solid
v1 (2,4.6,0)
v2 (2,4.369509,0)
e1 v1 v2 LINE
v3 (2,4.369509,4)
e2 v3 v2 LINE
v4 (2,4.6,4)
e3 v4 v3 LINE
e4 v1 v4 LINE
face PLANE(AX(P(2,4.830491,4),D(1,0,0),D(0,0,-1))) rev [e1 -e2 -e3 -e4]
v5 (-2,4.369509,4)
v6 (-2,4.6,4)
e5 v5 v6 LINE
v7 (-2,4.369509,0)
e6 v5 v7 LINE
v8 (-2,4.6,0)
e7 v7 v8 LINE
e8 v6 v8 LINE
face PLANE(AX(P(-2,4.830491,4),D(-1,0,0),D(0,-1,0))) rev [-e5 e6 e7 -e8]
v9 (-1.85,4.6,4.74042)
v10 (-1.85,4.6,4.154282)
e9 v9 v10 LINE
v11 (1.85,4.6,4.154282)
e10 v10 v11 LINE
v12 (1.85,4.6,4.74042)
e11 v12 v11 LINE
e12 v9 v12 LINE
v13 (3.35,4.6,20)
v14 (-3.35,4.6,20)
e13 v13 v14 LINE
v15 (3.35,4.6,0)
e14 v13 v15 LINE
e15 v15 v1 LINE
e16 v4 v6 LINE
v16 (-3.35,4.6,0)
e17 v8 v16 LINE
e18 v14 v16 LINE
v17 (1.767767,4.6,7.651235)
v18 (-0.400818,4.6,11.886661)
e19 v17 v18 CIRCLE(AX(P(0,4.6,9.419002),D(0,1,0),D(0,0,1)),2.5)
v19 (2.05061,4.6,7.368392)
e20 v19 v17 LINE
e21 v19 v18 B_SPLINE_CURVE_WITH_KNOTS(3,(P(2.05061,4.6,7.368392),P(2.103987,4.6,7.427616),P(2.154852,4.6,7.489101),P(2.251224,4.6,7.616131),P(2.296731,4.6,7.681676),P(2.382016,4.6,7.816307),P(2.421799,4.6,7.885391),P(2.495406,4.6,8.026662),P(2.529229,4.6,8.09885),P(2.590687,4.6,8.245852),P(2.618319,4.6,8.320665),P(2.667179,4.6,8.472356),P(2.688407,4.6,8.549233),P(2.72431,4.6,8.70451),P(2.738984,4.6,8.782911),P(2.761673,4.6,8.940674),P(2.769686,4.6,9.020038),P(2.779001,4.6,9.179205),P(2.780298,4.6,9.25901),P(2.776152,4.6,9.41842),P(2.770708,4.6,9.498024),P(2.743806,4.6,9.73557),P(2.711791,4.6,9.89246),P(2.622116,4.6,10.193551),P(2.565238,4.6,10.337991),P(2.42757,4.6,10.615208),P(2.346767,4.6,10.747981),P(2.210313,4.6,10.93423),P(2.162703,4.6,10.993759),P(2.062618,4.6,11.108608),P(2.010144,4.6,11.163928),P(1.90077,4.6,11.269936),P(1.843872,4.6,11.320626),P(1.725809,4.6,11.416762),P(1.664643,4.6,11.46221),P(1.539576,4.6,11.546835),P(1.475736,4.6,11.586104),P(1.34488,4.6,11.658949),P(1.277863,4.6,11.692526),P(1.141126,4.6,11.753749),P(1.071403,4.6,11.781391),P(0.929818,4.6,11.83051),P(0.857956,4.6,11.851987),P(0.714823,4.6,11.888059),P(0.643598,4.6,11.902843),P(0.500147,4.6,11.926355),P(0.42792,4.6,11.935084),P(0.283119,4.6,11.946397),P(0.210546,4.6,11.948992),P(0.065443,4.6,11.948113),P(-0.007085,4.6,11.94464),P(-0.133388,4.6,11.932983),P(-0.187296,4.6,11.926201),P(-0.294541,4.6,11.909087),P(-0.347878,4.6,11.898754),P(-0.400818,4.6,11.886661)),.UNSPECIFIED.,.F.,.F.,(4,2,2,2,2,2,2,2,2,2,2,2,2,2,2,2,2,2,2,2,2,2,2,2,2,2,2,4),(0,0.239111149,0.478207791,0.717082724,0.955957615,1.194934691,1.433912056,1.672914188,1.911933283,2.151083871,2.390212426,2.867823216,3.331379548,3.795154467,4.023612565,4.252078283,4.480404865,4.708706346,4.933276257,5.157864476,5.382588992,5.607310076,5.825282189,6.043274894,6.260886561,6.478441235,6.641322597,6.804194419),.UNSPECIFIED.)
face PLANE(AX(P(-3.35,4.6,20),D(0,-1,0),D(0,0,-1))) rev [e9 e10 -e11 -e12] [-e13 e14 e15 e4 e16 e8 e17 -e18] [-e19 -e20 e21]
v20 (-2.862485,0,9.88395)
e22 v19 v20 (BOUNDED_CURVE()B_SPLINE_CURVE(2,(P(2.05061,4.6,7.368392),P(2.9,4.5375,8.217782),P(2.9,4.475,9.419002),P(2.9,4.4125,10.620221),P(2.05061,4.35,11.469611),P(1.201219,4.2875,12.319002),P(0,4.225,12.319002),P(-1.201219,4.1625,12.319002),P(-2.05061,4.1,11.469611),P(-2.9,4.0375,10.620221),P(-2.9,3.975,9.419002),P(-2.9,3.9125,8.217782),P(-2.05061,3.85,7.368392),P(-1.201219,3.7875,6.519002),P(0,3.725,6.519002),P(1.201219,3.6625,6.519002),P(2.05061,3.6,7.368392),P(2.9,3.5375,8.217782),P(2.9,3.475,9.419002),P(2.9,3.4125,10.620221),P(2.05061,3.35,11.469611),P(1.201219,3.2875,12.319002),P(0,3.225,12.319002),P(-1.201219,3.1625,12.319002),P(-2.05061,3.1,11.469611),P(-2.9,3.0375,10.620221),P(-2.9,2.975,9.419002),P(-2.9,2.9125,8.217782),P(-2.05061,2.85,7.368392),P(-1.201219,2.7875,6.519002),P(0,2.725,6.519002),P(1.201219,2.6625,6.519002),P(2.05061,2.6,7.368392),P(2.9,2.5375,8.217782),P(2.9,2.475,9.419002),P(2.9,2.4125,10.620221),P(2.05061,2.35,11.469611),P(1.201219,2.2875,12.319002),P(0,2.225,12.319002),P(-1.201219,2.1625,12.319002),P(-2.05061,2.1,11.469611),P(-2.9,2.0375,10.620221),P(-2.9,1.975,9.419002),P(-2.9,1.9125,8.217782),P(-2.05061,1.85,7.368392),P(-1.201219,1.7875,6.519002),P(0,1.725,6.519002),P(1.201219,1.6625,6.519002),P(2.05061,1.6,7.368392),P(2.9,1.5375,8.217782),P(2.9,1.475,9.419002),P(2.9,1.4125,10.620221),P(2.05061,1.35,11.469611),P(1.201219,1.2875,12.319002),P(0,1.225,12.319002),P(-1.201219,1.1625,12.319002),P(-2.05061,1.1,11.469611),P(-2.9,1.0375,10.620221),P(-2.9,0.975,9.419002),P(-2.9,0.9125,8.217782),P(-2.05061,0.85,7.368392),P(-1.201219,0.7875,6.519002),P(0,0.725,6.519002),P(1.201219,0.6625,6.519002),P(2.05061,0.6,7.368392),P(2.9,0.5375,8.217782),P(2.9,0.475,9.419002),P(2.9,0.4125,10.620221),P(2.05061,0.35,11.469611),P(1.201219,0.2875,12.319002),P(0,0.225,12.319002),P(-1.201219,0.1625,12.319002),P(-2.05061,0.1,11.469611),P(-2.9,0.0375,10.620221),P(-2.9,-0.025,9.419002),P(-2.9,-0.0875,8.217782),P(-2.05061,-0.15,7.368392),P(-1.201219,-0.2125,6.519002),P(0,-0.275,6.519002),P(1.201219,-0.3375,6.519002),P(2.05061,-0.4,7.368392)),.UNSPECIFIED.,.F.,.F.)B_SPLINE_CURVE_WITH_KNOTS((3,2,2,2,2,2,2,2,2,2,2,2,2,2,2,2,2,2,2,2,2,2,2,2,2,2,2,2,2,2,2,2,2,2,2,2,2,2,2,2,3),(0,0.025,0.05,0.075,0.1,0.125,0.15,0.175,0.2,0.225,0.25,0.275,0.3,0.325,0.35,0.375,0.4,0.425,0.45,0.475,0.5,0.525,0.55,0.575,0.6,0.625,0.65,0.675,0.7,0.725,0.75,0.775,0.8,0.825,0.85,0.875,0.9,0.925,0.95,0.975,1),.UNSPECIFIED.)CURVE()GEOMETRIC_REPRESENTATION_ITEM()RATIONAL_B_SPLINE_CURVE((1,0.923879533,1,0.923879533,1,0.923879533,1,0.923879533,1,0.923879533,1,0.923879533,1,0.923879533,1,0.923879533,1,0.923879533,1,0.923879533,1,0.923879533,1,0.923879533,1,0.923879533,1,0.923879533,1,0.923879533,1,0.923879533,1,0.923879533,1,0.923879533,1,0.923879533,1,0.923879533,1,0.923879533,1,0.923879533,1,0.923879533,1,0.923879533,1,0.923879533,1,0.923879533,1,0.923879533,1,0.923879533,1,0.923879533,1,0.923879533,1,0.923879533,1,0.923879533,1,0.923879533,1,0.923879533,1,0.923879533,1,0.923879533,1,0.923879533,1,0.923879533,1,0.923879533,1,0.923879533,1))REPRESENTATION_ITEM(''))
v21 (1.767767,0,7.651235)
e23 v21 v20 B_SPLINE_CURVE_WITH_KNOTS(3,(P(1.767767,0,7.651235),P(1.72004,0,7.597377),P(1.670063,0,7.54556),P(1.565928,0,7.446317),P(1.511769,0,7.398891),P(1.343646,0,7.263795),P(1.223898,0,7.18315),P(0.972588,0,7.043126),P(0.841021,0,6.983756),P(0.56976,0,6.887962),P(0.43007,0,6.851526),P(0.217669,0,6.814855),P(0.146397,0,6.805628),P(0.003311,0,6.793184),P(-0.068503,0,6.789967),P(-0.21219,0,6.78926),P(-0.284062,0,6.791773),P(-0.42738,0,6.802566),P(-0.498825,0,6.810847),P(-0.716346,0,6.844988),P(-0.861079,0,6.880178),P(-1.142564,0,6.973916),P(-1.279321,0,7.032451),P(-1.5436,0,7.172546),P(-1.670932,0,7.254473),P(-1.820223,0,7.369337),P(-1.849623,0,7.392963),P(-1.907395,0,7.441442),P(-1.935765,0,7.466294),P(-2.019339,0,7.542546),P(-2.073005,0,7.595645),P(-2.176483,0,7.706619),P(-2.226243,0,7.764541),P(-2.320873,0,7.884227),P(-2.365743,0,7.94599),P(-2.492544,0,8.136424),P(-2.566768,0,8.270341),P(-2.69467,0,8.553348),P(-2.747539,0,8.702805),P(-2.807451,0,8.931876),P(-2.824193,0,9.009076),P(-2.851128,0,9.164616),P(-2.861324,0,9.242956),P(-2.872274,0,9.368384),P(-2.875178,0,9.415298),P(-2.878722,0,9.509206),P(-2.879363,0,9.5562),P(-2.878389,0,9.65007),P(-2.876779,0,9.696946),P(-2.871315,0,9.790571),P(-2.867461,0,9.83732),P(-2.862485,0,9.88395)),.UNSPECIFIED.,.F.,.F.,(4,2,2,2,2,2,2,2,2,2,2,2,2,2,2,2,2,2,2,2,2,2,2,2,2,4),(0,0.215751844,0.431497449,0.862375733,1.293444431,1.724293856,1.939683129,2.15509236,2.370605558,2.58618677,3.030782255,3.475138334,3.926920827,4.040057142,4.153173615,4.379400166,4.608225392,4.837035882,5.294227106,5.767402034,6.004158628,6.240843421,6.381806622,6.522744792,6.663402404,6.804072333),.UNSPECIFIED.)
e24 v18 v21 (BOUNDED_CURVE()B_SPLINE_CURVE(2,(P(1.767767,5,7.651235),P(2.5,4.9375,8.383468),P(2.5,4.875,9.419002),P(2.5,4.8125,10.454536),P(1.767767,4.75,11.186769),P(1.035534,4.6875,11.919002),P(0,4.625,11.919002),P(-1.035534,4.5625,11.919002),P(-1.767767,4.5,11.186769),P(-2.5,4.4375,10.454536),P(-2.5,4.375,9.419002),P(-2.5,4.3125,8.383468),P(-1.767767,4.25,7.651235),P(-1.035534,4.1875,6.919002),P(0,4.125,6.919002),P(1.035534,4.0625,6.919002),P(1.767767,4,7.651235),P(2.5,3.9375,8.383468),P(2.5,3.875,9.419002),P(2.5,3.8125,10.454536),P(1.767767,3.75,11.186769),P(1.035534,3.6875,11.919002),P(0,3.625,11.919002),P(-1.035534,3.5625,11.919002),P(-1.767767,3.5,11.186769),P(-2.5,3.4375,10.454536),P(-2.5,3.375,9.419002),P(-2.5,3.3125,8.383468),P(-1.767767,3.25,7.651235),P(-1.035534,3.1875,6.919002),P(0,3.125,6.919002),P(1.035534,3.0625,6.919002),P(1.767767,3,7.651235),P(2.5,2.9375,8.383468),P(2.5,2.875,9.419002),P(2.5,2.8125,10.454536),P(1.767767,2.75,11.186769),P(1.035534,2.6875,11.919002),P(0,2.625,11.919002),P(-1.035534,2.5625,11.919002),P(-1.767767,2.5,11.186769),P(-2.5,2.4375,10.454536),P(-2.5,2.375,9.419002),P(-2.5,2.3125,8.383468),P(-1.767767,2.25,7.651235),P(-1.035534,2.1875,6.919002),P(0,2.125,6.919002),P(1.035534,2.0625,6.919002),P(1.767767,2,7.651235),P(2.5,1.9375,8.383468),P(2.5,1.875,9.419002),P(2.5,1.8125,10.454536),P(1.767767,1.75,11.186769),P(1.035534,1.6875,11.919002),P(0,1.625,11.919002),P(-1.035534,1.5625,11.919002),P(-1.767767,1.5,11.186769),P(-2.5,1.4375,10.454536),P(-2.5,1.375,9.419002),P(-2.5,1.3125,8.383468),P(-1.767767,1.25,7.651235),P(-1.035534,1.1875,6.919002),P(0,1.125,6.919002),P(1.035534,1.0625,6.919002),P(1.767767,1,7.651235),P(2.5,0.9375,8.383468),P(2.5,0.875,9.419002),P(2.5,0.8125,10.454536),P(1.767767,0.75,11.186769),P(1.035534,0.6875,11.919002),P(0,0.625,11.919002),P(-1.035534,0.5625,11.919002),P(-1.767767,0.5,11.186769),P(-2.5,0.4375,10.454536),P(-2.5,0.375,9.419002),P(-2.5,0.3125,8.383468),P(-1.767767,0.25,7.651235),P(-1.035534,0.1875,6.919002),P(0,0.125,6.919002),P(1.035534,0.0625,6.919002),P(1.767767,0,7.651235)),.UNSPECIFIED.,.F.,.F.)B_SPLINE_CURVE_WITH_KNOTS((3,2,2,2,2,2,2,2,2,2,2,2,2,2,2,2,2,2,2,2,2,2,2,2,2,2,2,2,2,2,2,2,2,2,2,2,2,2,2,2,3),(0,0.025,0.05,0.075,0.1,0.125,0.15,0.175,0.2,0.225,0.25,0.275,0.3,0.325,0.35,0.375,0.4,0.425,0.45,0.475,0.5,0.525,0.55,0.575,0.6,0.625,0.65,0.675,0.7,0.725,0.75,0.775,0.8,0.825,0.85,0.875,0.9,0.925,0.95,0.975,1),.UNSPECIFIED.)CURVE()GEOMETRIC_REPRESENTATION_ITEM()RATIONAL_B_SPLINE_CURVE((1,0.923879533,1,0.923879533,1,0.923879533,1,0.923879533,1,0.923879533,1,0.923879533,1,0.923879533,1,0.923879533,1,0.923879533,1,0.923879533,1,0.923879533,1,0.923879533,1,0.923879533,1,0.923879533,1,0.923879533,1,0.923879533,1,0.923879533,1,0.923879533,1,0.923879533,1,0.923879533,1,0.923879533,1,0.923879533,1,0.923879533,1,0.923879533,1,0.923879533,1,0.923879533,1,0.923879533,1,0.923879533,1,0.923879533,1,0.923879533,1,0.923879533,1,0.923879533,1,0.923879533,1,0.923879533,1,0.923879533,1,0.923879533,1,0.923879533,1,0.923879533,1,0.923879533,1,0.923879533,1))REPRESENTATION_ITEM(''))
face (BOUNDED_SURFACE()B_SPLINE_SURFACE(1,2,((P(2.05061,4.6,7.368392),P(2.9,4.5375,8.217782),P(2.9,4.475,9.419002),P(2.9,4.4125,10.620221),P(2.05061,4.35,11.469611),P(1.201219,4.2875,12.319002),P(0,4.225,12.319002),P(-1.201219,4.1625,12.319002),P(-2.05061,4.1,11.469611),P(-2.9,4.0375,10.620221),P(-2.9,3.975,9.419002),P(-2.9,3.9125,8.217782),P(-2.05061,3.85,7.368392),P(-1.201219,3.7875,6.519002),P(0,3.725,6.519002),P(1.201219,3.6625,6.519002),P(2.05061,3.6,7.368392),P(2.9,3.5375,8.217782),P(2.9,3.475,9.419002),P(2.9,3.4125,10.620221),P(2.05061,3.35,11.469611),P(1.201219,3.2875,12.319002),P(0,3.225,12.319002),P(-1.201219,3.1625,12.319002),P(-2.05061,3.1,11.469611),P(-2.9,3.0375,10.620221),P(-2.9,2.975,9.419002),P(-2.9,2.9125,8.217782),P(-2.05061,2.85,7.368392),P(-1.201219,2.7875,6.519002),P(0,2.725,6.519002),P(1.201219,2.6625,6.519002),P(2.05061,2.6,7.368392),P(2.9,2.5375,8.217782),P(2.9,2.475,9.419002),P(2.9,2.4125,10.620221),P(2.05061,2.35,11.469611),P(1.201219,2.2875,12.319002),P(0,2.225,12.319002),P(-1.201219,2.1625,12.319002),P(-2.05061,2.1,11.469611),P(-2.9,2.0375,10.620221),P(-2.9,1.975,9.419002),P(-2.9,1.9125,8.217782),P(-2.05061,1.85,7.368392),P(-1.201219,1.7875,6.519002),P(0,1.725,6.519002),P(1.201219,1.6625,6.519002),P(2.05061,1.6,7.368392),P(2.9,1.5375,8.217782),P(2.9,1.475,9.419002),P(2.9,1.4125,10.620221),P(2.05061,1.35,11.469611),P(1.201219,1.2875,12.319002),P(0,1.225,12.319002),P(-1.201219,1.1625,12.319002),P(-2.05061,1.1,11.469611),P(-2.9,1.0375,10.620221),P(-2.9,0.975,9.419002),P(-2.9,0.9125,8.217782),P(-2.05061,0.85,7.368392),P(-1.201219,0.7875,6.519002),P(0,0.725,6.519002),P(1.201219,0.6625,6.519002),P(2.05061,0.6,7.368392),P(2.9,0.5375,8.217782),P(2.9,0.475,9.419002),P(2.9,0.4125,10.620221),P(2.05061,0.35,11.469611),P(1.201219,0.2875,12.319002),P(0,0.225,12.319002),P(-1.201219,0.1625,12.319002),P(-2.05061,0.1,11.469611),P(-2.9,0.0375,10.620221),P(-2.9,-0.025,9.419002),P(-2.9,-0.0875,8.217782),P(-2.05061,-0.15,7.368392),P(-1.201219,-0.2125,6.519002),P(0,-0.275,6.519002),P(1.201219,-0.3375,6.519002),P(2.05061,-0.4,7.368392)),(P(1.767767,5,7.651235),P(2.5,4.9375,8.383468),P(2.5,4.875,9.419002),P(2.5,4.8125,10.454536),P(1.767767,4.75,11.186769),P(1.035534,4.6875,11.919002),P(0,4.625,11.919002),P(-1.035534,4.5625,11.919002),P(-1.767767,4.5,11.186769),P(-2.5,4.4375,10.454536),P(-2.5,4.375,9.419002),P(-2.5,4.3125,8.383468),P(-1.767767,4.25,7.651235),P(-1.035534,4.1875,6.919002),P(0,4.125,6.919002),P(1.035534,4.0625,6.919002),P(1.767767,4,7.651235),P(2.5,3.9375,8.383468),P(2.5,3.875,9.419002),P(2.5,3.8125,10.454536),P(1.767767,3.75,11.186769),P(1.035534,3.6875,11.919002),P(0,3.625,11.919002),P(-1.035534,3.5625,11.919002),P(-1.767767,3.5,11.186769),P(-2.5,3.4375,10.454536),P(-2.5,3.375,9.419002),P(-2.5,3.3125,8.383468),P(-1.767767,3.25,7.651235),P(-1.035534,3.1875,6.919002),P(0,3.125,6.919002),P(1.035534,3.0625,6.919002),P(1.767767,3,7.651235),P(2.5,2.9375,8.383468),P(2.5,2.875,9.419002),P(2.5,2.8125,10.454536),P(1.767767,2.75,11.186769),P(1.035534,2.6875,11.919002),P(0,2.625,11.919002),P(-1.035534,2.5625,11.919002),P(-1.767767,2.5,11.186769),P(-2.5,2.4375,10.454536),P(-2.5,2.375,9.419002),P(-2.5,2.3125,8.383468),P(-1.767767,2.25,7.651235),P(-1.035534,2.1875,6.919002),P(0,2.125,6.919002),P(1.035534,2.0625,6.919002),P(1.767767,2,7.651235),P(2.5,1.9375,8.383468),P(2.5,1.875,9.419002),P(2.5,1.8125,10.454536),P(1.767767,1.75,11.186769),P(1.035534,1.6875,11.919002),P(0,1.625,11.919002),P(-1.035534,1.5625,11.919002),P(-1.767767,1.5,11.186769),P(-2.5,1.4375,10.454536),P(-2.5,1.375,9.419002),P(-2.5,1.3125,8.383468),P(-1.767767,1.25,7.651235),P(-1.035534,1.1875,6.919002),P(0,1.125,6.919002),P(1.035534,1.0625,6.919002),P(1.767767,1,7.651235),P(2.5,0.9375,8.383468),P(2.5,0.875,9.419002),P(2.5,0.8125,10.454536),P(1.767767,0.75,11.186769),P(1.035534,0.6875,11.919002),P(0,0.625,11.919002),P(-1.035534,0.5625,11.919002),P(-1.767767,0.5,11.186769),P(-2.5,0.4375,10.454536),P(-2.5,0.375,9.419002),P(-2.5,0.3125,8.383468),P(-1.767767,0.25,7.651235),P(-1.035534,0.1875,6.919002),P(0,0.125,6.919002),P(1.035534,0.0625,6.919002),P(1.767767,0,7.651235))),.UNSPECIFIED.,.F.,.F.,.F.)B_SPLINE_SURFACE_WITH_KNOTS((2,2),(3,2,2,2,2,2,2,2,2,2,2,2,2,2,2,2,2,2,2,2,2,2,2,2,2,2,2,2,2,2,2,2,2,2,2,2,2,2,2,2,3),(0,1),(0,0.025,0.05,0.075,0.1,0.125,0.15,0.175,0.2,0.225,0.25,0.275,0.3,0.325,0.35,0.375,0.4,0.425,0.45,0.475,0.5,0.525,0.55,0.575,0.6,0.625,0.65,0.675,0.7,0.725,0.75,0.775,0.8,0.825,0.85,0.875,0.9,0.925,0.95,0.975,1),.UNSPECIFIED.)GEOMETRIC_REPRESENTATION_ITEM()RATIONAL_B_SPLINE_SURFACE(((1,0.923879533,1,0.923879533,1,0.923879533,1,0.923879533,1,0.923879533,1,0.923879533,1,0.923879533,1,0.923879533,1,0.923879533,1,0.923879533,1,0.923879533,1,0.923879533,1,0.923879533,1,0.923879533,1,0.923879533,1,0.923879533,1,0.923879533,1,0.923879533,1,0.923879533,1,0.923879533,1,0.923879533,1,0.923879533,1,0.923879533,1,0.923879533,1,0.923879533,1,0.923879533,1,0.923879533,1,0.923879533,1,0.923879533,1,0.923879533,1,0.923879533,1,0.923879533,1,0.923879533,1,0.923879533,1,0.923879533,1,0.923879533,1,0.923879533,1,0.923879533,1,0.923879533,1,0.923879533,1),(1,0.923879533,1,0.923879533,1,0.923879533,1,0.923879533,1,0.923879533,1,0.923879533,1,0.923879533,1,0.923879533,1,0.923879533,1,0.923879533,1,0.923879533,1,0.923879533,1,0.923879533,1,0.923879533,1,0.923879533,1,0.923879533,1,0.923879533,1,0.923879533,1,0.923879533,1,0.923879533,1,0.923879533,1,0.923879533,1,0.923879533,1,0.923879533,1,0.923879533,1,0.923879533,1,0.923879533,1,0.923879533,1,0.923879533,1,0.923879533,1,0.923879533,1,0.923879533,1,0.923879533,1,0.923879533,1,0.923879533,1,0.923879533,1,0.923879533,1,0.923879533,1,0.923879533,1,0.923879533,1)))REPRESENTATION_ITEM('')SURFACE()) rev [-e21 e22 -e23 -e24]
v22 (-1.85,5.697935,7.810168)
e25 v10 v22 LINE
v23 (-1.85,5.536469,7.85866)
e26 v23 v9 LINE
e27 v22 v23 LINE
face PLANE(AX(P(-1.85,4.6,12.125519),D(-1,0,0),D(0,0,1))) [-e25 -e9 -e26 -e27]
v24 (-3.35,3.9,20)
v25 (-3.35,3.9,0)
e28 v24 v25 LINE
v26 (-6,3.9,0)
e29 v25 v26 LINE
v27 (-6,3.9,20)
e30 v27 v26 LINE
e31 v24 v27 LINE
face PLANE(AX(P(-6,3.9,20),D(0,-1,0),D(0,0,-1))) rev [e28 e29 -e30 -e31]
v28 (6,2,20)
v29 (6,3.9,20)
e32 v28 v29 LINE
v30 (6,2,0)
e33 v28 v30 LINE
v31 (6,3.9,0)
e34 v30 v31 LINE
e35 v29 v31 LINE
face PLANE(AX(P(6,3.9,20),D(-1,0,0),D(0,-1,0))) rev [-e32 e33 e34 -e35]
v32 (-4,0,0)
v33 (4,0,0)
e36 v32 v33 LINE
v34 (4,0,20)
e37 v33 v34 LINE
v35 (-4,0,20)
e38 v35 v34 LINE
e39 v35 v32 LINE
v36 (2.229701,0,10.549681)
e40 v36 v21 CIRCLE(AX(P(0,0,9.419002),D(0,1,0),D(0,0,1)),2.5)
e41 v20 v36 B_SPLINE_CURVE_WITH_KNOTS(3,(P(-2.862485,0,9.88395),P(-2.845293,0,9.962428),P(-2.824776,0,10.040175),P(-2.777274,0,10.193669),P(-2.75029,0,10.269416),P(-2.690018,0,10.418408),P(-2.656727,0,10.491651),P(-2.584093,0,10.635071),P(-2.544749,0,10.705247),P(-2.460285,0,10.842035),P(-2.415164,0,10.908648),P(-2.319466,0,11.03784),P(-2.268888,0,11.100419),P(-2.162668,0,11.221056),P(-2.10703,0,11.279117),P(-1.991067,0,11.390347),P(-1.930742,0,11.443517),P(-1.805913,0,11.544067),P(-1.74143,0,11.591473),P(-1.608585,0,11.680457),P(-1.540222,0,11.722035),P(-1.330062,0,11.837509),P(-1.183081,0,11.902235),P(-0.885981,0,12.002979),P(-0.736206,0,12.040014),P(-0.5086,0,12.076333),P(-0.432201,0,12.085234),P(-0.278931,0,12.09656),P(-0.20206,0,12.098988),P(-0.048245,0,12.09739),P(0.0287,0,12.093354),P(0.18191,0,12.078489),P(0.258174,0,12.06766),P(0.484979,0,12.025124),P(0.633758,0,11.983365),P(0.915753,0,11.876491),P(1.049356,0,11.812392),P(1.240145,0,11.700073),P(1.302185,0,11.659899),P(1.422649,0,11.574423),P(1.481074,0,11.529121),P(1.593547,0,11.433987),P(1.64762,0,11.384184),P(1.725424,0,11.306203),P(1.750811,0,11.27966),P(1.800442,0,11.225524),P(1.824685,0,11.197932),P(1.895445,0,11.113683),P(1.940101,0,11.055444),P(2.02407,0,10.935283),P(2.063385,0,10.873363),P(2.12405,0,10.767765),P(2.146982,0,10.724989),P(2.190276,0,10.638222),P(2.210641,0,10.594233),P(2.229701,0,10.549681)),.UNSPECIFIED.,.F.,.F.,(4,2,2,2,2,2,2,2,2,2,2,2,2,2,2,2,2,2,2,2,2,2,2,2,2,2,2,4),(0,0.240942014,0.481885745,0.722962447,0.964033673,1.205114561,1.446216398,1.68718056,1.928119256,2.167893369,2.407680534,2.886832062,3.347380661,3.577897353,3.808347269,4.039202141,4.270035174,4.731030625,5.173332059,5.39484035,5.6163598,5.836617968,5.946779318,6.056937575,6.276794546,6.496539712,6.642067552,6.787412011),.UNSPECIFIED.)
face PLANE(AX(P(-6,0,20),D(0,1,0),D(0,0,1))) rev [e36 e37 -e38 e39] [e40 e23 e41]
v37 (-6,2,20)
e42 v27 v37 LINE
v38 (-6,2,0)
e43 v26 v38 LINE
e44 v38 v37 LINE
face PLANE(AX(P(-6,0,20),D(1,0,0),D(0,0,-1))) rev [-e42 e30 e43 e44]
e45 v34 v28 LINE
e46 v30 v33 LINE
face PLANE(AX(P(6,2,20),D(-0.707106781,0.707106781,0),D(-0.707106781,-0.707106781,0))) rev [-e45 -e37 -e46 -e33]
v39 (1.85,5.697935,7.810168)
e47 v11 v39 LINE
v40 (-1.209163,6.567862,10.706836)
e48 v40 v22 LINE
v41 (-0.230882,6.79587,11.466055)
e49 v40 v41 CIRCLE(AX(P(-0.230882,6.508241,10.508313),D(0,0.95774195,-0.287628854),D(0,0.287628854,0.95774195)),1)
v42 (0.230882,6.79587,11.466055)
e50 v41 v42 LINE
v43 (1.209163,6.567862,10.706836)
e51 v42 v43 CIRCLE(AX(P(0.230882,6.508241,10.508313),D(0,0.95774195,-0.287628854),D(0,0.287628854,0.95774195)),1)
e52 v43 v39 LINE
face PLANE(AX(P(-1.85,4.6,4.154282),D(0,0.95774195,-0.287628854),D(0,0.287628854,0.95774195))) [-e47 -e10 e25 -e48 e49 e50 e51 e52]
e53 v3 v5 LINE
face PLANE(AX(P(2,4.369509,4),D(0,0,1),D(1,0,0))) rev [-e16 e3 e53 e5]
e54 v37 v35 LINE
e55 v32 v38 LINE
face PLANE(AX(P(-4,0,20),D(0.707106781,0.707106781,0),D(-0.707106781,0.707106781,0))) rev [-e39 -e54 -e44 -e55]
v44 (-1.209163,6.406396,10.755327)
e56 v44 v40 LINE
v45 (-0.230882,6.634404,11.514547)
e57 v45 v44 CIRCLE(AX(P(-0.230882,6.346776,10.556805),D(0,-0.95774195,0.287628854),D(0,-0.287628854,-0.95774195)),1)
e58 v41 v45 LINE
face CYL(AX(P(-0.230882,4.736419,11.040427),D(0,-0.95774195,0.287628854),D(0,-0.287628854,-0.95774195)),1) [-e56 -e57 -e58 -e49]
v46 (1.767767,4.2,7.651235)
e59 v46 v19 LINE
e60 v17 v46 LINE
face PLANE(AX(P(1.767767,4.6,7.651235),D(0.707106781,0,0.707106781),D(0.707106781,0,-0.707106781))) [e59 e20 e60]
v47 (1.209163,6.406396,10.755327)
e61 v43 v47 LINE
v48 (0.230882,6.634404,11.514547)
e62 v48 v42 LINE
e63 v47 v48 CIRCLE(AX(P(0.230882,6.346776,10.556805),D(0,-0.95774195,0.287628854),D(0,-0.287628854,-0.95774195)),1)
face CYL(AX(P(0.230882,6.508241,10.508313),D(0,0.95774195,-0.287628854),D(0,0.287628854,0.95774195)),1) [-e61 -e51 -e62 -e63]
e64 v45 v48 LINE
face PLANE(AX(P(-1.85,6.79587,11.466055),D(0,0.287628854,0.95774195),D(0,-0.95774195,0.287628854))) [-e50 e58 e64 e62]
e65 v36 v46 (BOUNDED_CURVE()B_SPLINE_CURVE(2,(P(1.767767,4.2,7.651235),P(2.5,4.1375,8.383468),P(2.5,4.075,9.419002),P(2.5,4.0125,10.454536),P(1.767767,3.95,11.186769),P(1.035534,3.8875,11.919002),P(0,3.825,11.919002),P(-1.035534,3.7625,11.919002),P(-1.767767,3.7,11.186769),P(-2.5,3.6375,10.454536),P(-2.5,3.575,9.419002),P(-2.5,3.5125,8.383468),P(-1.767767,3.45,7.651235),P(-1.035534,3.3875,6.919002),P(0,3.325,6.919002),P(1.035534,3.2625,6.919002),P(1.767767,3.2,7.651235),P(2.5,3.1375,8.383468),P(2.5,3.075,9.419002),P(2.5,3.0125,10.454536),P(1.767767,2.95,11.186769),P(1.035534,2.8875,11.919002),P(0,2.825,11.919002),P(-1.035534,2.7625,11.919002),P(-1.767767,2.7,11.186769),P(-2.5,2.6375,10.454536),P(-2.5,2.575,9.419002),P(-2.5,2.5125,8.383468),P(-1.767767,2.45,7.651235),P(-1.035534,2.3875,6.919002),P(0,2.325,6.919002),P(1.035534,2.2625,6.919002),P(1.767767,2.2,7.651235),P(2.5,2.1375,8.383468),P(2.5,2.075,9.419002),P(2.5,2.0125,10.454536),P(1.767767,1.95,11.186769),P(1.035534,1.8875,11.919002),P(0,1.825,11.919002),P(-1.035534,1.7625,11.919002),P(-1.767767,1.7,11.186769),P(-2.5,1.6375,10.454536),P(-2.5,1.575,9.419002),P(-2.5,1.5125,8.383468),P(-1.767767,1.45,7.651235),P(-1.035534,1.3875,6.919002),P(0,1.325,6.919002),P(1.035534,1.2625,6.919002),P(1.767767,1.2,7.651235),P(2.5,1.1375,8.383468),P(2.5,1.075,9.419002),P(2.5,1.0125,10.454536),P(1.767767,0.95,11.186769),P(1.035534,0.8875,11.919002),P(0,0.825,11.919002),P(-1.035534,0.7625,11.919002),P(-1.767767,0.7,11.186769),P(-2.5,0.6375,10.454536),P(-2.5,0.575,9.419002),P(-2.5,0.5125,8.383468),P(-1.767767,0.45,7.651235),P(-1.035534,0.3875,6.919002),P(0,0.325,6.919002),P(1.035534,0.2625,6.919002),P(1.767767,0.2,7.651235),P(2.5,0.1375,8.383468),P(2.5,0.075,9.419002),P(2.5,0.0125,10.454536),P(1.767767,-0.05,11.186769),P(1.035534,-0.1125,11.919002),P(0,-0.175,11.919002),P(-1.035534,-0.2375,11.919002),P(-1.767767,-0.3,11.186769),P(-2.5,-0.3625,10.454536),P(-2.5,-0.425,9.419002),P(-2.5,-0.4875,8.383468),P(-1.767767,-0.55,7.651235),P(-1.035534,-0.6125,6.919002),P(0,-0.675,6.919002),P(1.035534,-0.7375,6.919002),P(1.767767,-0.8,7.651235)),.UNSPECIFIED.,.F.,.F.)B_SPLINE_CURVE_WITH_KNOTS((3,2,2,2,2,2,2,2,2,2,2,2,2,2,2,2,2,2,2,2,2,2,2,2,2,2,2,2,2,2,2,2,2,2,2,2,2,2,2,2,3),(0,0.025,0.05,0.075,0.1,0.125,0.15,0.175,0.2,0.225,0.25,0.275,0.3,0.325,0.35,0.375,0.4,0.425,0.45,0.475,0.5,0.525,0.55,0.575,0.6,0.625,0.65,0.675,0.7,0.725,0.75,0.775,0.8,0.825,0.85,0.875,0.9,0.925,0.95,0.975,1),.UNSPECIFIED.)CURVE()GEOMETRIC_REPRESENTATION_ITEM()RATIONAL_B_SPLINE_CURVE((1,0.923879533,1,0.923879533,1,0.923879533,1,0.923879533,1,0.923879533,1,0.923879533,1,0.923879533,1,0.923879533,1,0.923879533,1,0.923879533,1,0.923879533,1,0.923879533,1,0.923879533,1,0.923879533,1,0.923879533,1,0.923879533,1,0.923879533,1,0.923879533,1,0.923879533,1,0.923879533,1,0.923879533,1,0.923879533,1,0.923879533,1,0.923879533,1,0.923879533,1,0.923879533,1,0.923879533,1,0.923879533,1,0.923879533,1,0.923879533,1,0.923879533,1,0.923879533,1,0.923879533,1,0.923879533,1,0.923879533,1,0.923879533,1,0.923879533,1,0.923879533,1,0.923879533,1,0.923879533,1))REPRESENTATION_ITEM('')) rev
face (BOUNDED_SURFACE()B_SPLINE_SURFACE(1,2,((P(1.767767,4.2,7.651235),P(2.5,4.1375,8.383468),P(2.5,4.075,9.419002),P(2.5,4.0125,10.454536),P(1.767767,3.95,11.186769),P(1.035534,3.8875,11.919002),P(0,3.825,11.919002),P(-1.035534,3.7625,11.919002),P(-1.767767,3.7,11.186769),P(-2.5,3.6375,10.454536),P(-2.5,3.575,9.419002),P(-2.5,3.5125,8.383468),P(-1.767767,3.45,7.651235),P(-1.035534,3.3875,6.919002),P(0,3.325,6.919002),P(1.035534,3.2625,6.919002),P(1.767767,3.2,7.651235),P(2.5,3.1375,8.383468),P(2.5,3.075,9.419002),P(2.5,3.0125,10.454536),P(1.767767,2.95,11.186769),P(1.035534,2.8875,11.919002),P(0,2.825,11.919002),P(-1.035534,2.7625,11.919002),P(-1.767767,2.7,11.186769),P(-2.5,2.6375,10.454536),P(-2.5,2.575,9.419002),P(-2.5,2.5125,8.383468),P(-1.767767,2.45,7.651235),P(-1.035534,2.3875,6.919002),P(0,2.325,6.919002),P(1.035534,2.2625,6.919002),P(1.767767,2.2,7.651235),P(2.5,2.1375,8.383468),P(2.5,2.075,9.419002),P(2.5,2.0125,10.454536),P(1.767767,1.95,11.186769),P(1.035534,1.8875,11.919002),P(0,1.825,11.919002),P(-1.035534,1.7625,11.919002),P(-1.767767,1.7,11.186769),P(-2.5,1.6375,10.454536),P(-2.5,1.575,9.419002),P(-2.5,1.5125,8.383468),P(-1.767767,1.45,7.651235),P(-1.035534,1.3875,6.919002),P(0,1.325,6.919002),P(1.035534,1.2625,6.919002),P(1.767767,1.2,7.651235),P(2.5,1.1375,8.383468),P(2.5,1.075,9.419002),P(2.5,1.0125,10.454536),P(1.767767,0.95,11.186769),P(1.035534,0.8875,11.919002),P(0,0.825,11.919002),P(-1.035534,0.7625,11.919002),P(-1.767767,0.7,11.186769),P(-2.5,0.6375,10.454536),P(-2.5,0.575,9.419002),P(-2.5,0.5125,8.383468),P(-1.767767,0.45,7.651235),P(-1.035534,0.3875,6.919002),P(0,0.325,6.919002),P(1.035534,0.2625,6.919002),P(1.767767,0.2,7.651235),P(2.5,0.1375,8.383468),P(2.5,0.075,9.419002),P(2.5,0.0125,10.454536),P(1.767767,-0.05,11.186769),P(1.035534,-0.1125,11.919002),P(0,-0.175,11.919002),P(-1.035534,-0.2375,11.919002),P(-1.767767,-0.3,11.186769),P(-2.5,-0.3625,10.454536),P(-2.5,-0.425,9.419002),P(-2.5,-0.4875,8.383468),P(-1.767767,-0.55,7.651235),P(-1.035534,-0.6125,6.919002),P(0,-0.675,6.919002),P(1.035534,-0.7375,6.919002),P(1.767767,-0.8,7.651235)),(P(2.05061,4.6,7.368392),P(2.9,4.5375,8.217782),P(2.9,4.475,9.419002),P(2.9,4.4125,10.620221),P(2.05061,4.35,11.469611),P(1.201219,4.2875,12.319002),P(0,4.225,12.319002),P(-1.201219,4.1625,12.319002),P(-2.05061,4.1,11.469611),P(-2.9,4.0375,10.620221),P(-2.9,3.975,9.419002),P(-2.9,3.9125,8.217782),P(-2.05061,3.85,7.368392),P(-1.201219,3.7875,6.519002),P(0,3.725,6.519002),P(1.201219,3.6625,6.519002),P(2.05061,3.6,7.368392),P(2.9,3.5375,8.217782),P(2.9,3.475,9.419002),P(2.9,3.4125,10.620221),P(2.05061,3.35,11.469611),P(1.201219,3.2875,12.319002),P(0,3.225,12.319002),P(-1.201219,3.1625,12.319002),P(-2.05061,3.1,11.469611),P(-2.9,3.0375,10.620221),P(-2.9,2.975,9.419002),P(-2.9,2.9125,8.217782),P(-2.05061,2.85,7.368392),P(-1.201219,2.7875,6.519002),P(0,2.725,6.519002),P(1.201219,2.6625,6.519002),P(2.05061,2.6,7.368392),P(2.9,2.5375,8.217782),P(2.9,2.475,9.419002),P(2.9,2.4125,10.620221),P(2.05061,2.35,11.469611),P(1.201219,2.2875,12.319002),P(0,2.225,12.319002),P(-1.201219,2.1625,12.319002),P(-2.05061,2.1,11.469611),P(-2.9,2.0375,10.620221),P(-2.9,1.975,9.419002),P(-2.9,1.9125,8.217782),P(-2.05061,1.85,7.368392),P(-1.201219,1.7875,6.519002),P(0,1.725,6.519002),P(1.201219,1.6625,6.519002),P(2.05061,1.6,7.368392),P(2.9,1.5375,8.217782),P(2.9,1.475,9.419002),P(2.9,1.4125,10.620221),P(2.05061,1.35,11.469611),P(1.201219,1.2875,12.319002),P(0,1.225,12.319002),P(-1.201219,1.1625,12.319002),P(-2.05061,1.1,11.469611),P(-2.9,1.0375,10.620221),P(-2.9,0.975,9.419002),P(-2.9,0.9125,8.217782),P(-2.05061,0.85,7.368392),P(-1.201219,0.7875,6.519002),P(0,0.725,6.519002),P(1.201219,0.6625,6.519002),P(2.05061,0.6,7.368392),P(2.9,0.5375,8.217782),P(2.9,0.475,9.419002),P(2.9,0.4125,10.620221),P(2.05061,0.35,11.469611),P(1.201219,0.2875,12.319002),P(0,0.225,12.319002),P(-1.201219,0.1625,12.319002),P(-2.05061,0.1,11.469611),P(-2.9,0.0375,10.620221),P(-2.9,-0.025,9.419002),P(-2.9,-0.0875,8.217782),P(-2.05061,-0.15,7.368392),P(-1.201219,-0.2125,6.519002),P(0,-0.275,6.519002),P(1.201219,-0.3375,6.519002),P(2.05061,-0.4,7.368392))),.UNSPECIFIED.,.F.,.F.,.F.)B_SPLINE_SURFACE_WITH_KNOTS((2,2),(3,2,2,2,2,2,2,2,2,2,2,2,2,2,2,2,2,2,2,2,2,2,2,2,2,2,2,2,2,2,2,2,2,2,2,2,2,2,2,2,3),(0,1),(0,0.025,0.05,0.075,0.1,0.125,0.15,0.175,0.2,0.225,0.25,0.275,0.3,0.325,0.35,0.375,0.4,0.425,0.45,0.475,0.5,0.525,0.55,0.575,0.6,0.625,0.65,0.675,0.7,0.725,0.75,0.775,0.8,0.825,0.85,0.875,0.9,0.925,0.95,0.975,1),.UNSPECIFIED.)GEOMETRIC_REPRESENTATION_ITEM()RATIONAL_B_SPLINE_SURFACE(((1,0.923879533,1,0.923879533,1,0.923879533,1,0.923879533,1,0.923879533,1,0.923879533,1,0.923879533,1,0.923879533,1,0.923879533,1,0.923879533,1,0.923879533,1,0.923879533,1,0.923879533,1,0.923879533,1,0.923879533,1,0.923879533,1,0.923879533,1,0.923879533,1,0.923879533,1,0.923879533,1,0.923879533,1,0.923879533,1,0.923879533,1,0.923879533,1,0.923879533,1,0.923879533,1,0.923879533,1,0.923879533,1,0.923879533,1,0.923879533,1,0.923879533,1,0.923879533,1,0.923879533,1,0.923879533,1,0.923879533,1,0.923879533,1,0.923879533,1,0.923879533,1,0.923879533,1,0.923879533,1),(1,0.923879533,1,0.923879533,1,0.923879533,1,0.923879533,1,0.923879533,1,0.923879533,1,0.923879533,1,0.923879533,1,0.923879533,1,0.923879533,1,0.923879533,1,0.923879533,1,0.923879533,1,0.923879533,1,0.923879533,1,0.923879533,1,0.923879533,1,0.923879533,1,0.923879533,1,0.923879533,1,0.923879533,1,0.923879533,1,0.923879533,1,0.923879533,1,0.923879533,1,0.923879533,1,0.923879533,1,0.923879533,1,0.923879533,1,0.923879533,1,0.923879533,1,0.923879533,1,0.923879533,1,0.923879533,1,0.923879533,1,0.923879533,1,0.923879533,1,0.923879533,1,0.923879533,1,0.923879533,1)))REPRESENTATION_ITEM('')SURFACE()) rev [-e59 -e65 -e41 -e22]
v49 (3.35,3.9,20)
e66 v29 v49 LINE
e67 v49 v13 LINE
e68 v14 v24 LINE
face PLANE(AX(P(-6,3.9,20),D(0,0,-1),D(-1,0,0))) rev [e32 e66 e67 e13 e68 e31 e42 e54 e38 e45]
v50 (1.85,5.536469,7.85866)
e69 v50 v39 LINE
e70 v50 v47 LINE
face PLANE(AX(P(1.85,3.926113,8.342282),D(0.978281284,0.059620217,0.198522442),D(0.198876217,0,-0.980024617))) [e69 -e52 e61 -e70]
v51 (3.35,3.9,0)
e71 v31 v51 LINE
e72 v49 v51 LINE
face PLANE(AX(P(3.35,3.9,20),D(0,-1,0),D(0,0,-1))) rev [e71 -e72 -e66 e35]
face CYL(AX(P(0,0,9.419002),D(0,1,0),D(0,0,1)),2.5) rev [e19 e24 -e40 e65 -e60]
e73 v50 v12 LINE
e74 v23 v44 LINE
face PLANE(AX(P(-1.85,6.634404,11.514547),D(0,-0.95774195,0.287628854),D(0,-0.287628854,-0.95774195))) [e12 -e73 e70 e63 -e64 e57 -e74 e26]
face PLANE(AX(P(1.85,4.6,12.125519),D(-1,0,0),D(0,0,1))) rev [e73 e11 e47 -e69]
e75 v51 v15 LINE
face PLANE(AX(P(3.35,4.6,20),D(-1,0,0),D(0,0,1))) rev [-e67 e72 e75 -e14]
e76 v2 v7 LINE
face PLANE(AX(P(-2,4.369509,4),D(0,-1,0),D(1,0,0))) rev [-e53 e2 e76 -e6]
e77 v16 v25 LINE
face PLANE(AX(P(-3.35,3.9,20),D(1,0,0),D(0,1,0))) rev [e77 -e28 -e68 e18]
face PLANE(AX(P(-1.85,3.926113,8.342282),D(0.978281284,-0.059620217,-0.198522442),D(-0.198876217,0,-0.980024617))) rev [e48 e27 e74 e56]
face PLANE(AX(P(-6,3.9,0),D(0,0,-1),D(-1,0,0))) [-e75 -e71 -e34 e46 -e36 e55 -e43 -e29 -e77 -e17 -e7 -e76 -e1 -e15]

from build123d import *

# Parameters (mm, degrees)
EXTRUDE_1_DEPTH      = 20
CHAMFER_1_SIZE       = 2
SKETCH_2_R           = 2.5
CUT_EXTRUDE_1_DEPTH  = 22.381300241
SWEEP_1_PITCH        = 1
SKETCH_6_W           = 4
SKETCH_6_H           = 0.46098281
CUT_EXTRUDE_2_DEPTH  = 4
EXTRUDE_2_DEPTH      = 1.85
EXTRUDE_2_DEPTH_BACK = 1.85
CUT_EXTRUDE_3_DEPTH  = 1.85
FILLET_1_R           = 1


with BuildPart() as part:
    # 草图1 → 凸台-拉伸1 (new body)
    with BuildSketch(Plane.XY):
        Polygon((-6, 0), (6, 0), (6, 3.9), (3.35, 3.9), (3.35, 4.6), (-3.35, 4.6), (-3.35, 3.9), (-6, 3.9), align=None)
    extrude(amount=EXTRUDE_1_DEPTH)

    # 倒角1
    chamfer_1_edges = [part.edges().sort_by_distance(p)[0] for p in [
        (6, 0, 10),
        (-6, 0, 10),
    ]]
    chamfer(chamfer_1_edges, length=CHAMFER_1_SIZE)

    # 草图2 → 切除-拉伸1 (cut, through all)
    with BuildSketch(Plane(origin=(0, 4.6, 0), x_dir=(1, 0, 0), z_dir=(0, 1, 0))):
        with Locations(Location((0, -9.419001614, 0), (0, 0, 270))):
            Circle(SKETCH_2_R)
    extrude(amount=-CUT_EXTRUDE_1_DEPTH, mode=Mode.SUBTRACT)

    # 切除-扫描1: arcs per turn and ends read off the stored shape
    # 切除-扫描1: the profile of 草图5 profile screwed along a right-hand helix through 5 turns, 8 arcs to a turn; built about Z, then put on its axis
    sweep_1_z = Axis((0, 0, 0), (0, 0, 1))
    sweep_1_corners = [(2.4997, 0, -0.4003), (2.4997, 0, 0.4003), (2.9, 0, 0)]
    with BuildLine(mode=Mode.PRIVATE) as sweep_1_profile:
        Line(sweep_1_corners[0], sweep_1_corners[1])
        Line(sweep_1_corners[1], sweep_1_corners[2])
        Line(sweep_1_corners[2], sweep_1_corners[0])
    sweep_1_cap = Face(sweep_1_profile.wire())
    sweep_1_turn_angles = [0, 22.5, 45, 67.5, 90, 112.5, 135, 157.5, 180, 202.5, 225, 247.5, 270, 292.5, 315, 337.5, 360]
    sweep_1_turn_weights = [1, 0.9238795325112867, 1, 0.9238795325112867, 1, 0.9238795325112867, 1, 0.9238795325112867, 1, 0.9238795325112867, 1, 0.9238795325112867, 1, 0.9238795325112867, 1, 0.9238795325112867, 1]
    sweep_1_turn_rails = [Edge.make_bspline([Vector(p[0], p[1], 0).rotate(sweep_1_z, sweep_1_turn_angles[k]) / sweep_1_turn_weights[k] + Vector(0, 0, p[2] + SWEEP_1_PITCH * sweep_1_turn_angles[k] / 360) for k in range(17)], [0, 0, 0, 1, 1, 2, 2, 3, 3, 4, 4, 5, 5, 6, 6, 7, 7, 8, 8, 8], 2, sweep_1_turn_weights) for p in sweep_1_corners]
    sweep_1_turn_sides = [Face.make_surface_from_curves(sweep_1_turn_rails[p[0]], sweep_1_turn_rails[p[1]]) for p in [(0, 1), (1, 2), (2, 0)]]
    sweep_1 = Plane(origin=(0, 4.6, 9.419001614), x_dir=(0.7071067811865438, 0, -0.7071067811865513), z_dir=(0, -1, 0)) * Solid(Shell([*[p.moved(Location((0, 0, SWEEP_1_PITCH * i))) for i in range(5) for p in sweep_1_turn_sides], sweep_1_cap, sweep_1_cap.rotate(sweep_1_z, 1800).moved(Location((0, 0, SWEEP_1_PITCH * 1800 / 360)))]))
    add(sweep_1, mode=Mode.SUBTRACT)

    # 草图6 → 切除-拉伸2 (cut)
    with BuildSketch(Plane(origin=(0, 0, 0), x_dir=(-1, 0, 0), z_dir=(0, 0, -1))):
        with Locations((0, 4.6)):
            Rectangle(SKETCH_6_W, SKETCH_6_H)
    extrude(amount=-CUT_EXTRUDE_2_DEPTH, mode=Mode.SUBTRACT)

    # 草图7 → 凸台-拉伸2 (add, two sides: drawn at the far end of the back side and taken through both)
    with BuildSketch(Plane(origin=(0, 0, 0), x_dir=(0, 0, -1), z_dir=(1, 0, 0)).offset(-EXTRUDE_2_DEPTH_BACK)):
        Polygon((-4.154281608, 4.6), (-11.466055335, 6.795870295), (-11.514546749, 6.63440436), (-4.740419706, 4.6), align=None)
    extrude(amount=EXTRUDE_2_DEPTH + EXTRUDE_2_DEPTH_BACK)

    # 草图8 → 切除-拉伸3 (cut)
    with BuildSketch(Plane(origin=(0, 3.075042872, -0.923496206), x_dir=(1, 0, 0), z_dir=(0, 0.9577419497796025, -0.2876288539635158))):
        Polygon((-1.85, -9.119016537), (-1.041199164, -12.936210577), (-1.85, -12.936210577), align=None)
    cut_extrude_3 = extrude(amount=-CUT_EXTRUDE_3_DEPTH, mode=Mode.SUBTRACT)

    # 镜向1: 切除-拉伸3 across plane
    add(cut_extrude_3.mirror(Plane(origin=(0, 0, 0), x_dir=(0, 0, 1), z_dir=(1, 0, 0))), mode=Mode.SUBTRACT)

    # 圆角1
    fillet_1_edges = [part.edges().sort_by_distance(p)[0] for p in [
        (-1.041199164, 6.715137327, 11.490301042),
        (1.041199164, 6.715137327, 11.490301042),
    ]]
    fillet(fillet_1_edges, radius=FILLET_1_R)


solid = part.part
